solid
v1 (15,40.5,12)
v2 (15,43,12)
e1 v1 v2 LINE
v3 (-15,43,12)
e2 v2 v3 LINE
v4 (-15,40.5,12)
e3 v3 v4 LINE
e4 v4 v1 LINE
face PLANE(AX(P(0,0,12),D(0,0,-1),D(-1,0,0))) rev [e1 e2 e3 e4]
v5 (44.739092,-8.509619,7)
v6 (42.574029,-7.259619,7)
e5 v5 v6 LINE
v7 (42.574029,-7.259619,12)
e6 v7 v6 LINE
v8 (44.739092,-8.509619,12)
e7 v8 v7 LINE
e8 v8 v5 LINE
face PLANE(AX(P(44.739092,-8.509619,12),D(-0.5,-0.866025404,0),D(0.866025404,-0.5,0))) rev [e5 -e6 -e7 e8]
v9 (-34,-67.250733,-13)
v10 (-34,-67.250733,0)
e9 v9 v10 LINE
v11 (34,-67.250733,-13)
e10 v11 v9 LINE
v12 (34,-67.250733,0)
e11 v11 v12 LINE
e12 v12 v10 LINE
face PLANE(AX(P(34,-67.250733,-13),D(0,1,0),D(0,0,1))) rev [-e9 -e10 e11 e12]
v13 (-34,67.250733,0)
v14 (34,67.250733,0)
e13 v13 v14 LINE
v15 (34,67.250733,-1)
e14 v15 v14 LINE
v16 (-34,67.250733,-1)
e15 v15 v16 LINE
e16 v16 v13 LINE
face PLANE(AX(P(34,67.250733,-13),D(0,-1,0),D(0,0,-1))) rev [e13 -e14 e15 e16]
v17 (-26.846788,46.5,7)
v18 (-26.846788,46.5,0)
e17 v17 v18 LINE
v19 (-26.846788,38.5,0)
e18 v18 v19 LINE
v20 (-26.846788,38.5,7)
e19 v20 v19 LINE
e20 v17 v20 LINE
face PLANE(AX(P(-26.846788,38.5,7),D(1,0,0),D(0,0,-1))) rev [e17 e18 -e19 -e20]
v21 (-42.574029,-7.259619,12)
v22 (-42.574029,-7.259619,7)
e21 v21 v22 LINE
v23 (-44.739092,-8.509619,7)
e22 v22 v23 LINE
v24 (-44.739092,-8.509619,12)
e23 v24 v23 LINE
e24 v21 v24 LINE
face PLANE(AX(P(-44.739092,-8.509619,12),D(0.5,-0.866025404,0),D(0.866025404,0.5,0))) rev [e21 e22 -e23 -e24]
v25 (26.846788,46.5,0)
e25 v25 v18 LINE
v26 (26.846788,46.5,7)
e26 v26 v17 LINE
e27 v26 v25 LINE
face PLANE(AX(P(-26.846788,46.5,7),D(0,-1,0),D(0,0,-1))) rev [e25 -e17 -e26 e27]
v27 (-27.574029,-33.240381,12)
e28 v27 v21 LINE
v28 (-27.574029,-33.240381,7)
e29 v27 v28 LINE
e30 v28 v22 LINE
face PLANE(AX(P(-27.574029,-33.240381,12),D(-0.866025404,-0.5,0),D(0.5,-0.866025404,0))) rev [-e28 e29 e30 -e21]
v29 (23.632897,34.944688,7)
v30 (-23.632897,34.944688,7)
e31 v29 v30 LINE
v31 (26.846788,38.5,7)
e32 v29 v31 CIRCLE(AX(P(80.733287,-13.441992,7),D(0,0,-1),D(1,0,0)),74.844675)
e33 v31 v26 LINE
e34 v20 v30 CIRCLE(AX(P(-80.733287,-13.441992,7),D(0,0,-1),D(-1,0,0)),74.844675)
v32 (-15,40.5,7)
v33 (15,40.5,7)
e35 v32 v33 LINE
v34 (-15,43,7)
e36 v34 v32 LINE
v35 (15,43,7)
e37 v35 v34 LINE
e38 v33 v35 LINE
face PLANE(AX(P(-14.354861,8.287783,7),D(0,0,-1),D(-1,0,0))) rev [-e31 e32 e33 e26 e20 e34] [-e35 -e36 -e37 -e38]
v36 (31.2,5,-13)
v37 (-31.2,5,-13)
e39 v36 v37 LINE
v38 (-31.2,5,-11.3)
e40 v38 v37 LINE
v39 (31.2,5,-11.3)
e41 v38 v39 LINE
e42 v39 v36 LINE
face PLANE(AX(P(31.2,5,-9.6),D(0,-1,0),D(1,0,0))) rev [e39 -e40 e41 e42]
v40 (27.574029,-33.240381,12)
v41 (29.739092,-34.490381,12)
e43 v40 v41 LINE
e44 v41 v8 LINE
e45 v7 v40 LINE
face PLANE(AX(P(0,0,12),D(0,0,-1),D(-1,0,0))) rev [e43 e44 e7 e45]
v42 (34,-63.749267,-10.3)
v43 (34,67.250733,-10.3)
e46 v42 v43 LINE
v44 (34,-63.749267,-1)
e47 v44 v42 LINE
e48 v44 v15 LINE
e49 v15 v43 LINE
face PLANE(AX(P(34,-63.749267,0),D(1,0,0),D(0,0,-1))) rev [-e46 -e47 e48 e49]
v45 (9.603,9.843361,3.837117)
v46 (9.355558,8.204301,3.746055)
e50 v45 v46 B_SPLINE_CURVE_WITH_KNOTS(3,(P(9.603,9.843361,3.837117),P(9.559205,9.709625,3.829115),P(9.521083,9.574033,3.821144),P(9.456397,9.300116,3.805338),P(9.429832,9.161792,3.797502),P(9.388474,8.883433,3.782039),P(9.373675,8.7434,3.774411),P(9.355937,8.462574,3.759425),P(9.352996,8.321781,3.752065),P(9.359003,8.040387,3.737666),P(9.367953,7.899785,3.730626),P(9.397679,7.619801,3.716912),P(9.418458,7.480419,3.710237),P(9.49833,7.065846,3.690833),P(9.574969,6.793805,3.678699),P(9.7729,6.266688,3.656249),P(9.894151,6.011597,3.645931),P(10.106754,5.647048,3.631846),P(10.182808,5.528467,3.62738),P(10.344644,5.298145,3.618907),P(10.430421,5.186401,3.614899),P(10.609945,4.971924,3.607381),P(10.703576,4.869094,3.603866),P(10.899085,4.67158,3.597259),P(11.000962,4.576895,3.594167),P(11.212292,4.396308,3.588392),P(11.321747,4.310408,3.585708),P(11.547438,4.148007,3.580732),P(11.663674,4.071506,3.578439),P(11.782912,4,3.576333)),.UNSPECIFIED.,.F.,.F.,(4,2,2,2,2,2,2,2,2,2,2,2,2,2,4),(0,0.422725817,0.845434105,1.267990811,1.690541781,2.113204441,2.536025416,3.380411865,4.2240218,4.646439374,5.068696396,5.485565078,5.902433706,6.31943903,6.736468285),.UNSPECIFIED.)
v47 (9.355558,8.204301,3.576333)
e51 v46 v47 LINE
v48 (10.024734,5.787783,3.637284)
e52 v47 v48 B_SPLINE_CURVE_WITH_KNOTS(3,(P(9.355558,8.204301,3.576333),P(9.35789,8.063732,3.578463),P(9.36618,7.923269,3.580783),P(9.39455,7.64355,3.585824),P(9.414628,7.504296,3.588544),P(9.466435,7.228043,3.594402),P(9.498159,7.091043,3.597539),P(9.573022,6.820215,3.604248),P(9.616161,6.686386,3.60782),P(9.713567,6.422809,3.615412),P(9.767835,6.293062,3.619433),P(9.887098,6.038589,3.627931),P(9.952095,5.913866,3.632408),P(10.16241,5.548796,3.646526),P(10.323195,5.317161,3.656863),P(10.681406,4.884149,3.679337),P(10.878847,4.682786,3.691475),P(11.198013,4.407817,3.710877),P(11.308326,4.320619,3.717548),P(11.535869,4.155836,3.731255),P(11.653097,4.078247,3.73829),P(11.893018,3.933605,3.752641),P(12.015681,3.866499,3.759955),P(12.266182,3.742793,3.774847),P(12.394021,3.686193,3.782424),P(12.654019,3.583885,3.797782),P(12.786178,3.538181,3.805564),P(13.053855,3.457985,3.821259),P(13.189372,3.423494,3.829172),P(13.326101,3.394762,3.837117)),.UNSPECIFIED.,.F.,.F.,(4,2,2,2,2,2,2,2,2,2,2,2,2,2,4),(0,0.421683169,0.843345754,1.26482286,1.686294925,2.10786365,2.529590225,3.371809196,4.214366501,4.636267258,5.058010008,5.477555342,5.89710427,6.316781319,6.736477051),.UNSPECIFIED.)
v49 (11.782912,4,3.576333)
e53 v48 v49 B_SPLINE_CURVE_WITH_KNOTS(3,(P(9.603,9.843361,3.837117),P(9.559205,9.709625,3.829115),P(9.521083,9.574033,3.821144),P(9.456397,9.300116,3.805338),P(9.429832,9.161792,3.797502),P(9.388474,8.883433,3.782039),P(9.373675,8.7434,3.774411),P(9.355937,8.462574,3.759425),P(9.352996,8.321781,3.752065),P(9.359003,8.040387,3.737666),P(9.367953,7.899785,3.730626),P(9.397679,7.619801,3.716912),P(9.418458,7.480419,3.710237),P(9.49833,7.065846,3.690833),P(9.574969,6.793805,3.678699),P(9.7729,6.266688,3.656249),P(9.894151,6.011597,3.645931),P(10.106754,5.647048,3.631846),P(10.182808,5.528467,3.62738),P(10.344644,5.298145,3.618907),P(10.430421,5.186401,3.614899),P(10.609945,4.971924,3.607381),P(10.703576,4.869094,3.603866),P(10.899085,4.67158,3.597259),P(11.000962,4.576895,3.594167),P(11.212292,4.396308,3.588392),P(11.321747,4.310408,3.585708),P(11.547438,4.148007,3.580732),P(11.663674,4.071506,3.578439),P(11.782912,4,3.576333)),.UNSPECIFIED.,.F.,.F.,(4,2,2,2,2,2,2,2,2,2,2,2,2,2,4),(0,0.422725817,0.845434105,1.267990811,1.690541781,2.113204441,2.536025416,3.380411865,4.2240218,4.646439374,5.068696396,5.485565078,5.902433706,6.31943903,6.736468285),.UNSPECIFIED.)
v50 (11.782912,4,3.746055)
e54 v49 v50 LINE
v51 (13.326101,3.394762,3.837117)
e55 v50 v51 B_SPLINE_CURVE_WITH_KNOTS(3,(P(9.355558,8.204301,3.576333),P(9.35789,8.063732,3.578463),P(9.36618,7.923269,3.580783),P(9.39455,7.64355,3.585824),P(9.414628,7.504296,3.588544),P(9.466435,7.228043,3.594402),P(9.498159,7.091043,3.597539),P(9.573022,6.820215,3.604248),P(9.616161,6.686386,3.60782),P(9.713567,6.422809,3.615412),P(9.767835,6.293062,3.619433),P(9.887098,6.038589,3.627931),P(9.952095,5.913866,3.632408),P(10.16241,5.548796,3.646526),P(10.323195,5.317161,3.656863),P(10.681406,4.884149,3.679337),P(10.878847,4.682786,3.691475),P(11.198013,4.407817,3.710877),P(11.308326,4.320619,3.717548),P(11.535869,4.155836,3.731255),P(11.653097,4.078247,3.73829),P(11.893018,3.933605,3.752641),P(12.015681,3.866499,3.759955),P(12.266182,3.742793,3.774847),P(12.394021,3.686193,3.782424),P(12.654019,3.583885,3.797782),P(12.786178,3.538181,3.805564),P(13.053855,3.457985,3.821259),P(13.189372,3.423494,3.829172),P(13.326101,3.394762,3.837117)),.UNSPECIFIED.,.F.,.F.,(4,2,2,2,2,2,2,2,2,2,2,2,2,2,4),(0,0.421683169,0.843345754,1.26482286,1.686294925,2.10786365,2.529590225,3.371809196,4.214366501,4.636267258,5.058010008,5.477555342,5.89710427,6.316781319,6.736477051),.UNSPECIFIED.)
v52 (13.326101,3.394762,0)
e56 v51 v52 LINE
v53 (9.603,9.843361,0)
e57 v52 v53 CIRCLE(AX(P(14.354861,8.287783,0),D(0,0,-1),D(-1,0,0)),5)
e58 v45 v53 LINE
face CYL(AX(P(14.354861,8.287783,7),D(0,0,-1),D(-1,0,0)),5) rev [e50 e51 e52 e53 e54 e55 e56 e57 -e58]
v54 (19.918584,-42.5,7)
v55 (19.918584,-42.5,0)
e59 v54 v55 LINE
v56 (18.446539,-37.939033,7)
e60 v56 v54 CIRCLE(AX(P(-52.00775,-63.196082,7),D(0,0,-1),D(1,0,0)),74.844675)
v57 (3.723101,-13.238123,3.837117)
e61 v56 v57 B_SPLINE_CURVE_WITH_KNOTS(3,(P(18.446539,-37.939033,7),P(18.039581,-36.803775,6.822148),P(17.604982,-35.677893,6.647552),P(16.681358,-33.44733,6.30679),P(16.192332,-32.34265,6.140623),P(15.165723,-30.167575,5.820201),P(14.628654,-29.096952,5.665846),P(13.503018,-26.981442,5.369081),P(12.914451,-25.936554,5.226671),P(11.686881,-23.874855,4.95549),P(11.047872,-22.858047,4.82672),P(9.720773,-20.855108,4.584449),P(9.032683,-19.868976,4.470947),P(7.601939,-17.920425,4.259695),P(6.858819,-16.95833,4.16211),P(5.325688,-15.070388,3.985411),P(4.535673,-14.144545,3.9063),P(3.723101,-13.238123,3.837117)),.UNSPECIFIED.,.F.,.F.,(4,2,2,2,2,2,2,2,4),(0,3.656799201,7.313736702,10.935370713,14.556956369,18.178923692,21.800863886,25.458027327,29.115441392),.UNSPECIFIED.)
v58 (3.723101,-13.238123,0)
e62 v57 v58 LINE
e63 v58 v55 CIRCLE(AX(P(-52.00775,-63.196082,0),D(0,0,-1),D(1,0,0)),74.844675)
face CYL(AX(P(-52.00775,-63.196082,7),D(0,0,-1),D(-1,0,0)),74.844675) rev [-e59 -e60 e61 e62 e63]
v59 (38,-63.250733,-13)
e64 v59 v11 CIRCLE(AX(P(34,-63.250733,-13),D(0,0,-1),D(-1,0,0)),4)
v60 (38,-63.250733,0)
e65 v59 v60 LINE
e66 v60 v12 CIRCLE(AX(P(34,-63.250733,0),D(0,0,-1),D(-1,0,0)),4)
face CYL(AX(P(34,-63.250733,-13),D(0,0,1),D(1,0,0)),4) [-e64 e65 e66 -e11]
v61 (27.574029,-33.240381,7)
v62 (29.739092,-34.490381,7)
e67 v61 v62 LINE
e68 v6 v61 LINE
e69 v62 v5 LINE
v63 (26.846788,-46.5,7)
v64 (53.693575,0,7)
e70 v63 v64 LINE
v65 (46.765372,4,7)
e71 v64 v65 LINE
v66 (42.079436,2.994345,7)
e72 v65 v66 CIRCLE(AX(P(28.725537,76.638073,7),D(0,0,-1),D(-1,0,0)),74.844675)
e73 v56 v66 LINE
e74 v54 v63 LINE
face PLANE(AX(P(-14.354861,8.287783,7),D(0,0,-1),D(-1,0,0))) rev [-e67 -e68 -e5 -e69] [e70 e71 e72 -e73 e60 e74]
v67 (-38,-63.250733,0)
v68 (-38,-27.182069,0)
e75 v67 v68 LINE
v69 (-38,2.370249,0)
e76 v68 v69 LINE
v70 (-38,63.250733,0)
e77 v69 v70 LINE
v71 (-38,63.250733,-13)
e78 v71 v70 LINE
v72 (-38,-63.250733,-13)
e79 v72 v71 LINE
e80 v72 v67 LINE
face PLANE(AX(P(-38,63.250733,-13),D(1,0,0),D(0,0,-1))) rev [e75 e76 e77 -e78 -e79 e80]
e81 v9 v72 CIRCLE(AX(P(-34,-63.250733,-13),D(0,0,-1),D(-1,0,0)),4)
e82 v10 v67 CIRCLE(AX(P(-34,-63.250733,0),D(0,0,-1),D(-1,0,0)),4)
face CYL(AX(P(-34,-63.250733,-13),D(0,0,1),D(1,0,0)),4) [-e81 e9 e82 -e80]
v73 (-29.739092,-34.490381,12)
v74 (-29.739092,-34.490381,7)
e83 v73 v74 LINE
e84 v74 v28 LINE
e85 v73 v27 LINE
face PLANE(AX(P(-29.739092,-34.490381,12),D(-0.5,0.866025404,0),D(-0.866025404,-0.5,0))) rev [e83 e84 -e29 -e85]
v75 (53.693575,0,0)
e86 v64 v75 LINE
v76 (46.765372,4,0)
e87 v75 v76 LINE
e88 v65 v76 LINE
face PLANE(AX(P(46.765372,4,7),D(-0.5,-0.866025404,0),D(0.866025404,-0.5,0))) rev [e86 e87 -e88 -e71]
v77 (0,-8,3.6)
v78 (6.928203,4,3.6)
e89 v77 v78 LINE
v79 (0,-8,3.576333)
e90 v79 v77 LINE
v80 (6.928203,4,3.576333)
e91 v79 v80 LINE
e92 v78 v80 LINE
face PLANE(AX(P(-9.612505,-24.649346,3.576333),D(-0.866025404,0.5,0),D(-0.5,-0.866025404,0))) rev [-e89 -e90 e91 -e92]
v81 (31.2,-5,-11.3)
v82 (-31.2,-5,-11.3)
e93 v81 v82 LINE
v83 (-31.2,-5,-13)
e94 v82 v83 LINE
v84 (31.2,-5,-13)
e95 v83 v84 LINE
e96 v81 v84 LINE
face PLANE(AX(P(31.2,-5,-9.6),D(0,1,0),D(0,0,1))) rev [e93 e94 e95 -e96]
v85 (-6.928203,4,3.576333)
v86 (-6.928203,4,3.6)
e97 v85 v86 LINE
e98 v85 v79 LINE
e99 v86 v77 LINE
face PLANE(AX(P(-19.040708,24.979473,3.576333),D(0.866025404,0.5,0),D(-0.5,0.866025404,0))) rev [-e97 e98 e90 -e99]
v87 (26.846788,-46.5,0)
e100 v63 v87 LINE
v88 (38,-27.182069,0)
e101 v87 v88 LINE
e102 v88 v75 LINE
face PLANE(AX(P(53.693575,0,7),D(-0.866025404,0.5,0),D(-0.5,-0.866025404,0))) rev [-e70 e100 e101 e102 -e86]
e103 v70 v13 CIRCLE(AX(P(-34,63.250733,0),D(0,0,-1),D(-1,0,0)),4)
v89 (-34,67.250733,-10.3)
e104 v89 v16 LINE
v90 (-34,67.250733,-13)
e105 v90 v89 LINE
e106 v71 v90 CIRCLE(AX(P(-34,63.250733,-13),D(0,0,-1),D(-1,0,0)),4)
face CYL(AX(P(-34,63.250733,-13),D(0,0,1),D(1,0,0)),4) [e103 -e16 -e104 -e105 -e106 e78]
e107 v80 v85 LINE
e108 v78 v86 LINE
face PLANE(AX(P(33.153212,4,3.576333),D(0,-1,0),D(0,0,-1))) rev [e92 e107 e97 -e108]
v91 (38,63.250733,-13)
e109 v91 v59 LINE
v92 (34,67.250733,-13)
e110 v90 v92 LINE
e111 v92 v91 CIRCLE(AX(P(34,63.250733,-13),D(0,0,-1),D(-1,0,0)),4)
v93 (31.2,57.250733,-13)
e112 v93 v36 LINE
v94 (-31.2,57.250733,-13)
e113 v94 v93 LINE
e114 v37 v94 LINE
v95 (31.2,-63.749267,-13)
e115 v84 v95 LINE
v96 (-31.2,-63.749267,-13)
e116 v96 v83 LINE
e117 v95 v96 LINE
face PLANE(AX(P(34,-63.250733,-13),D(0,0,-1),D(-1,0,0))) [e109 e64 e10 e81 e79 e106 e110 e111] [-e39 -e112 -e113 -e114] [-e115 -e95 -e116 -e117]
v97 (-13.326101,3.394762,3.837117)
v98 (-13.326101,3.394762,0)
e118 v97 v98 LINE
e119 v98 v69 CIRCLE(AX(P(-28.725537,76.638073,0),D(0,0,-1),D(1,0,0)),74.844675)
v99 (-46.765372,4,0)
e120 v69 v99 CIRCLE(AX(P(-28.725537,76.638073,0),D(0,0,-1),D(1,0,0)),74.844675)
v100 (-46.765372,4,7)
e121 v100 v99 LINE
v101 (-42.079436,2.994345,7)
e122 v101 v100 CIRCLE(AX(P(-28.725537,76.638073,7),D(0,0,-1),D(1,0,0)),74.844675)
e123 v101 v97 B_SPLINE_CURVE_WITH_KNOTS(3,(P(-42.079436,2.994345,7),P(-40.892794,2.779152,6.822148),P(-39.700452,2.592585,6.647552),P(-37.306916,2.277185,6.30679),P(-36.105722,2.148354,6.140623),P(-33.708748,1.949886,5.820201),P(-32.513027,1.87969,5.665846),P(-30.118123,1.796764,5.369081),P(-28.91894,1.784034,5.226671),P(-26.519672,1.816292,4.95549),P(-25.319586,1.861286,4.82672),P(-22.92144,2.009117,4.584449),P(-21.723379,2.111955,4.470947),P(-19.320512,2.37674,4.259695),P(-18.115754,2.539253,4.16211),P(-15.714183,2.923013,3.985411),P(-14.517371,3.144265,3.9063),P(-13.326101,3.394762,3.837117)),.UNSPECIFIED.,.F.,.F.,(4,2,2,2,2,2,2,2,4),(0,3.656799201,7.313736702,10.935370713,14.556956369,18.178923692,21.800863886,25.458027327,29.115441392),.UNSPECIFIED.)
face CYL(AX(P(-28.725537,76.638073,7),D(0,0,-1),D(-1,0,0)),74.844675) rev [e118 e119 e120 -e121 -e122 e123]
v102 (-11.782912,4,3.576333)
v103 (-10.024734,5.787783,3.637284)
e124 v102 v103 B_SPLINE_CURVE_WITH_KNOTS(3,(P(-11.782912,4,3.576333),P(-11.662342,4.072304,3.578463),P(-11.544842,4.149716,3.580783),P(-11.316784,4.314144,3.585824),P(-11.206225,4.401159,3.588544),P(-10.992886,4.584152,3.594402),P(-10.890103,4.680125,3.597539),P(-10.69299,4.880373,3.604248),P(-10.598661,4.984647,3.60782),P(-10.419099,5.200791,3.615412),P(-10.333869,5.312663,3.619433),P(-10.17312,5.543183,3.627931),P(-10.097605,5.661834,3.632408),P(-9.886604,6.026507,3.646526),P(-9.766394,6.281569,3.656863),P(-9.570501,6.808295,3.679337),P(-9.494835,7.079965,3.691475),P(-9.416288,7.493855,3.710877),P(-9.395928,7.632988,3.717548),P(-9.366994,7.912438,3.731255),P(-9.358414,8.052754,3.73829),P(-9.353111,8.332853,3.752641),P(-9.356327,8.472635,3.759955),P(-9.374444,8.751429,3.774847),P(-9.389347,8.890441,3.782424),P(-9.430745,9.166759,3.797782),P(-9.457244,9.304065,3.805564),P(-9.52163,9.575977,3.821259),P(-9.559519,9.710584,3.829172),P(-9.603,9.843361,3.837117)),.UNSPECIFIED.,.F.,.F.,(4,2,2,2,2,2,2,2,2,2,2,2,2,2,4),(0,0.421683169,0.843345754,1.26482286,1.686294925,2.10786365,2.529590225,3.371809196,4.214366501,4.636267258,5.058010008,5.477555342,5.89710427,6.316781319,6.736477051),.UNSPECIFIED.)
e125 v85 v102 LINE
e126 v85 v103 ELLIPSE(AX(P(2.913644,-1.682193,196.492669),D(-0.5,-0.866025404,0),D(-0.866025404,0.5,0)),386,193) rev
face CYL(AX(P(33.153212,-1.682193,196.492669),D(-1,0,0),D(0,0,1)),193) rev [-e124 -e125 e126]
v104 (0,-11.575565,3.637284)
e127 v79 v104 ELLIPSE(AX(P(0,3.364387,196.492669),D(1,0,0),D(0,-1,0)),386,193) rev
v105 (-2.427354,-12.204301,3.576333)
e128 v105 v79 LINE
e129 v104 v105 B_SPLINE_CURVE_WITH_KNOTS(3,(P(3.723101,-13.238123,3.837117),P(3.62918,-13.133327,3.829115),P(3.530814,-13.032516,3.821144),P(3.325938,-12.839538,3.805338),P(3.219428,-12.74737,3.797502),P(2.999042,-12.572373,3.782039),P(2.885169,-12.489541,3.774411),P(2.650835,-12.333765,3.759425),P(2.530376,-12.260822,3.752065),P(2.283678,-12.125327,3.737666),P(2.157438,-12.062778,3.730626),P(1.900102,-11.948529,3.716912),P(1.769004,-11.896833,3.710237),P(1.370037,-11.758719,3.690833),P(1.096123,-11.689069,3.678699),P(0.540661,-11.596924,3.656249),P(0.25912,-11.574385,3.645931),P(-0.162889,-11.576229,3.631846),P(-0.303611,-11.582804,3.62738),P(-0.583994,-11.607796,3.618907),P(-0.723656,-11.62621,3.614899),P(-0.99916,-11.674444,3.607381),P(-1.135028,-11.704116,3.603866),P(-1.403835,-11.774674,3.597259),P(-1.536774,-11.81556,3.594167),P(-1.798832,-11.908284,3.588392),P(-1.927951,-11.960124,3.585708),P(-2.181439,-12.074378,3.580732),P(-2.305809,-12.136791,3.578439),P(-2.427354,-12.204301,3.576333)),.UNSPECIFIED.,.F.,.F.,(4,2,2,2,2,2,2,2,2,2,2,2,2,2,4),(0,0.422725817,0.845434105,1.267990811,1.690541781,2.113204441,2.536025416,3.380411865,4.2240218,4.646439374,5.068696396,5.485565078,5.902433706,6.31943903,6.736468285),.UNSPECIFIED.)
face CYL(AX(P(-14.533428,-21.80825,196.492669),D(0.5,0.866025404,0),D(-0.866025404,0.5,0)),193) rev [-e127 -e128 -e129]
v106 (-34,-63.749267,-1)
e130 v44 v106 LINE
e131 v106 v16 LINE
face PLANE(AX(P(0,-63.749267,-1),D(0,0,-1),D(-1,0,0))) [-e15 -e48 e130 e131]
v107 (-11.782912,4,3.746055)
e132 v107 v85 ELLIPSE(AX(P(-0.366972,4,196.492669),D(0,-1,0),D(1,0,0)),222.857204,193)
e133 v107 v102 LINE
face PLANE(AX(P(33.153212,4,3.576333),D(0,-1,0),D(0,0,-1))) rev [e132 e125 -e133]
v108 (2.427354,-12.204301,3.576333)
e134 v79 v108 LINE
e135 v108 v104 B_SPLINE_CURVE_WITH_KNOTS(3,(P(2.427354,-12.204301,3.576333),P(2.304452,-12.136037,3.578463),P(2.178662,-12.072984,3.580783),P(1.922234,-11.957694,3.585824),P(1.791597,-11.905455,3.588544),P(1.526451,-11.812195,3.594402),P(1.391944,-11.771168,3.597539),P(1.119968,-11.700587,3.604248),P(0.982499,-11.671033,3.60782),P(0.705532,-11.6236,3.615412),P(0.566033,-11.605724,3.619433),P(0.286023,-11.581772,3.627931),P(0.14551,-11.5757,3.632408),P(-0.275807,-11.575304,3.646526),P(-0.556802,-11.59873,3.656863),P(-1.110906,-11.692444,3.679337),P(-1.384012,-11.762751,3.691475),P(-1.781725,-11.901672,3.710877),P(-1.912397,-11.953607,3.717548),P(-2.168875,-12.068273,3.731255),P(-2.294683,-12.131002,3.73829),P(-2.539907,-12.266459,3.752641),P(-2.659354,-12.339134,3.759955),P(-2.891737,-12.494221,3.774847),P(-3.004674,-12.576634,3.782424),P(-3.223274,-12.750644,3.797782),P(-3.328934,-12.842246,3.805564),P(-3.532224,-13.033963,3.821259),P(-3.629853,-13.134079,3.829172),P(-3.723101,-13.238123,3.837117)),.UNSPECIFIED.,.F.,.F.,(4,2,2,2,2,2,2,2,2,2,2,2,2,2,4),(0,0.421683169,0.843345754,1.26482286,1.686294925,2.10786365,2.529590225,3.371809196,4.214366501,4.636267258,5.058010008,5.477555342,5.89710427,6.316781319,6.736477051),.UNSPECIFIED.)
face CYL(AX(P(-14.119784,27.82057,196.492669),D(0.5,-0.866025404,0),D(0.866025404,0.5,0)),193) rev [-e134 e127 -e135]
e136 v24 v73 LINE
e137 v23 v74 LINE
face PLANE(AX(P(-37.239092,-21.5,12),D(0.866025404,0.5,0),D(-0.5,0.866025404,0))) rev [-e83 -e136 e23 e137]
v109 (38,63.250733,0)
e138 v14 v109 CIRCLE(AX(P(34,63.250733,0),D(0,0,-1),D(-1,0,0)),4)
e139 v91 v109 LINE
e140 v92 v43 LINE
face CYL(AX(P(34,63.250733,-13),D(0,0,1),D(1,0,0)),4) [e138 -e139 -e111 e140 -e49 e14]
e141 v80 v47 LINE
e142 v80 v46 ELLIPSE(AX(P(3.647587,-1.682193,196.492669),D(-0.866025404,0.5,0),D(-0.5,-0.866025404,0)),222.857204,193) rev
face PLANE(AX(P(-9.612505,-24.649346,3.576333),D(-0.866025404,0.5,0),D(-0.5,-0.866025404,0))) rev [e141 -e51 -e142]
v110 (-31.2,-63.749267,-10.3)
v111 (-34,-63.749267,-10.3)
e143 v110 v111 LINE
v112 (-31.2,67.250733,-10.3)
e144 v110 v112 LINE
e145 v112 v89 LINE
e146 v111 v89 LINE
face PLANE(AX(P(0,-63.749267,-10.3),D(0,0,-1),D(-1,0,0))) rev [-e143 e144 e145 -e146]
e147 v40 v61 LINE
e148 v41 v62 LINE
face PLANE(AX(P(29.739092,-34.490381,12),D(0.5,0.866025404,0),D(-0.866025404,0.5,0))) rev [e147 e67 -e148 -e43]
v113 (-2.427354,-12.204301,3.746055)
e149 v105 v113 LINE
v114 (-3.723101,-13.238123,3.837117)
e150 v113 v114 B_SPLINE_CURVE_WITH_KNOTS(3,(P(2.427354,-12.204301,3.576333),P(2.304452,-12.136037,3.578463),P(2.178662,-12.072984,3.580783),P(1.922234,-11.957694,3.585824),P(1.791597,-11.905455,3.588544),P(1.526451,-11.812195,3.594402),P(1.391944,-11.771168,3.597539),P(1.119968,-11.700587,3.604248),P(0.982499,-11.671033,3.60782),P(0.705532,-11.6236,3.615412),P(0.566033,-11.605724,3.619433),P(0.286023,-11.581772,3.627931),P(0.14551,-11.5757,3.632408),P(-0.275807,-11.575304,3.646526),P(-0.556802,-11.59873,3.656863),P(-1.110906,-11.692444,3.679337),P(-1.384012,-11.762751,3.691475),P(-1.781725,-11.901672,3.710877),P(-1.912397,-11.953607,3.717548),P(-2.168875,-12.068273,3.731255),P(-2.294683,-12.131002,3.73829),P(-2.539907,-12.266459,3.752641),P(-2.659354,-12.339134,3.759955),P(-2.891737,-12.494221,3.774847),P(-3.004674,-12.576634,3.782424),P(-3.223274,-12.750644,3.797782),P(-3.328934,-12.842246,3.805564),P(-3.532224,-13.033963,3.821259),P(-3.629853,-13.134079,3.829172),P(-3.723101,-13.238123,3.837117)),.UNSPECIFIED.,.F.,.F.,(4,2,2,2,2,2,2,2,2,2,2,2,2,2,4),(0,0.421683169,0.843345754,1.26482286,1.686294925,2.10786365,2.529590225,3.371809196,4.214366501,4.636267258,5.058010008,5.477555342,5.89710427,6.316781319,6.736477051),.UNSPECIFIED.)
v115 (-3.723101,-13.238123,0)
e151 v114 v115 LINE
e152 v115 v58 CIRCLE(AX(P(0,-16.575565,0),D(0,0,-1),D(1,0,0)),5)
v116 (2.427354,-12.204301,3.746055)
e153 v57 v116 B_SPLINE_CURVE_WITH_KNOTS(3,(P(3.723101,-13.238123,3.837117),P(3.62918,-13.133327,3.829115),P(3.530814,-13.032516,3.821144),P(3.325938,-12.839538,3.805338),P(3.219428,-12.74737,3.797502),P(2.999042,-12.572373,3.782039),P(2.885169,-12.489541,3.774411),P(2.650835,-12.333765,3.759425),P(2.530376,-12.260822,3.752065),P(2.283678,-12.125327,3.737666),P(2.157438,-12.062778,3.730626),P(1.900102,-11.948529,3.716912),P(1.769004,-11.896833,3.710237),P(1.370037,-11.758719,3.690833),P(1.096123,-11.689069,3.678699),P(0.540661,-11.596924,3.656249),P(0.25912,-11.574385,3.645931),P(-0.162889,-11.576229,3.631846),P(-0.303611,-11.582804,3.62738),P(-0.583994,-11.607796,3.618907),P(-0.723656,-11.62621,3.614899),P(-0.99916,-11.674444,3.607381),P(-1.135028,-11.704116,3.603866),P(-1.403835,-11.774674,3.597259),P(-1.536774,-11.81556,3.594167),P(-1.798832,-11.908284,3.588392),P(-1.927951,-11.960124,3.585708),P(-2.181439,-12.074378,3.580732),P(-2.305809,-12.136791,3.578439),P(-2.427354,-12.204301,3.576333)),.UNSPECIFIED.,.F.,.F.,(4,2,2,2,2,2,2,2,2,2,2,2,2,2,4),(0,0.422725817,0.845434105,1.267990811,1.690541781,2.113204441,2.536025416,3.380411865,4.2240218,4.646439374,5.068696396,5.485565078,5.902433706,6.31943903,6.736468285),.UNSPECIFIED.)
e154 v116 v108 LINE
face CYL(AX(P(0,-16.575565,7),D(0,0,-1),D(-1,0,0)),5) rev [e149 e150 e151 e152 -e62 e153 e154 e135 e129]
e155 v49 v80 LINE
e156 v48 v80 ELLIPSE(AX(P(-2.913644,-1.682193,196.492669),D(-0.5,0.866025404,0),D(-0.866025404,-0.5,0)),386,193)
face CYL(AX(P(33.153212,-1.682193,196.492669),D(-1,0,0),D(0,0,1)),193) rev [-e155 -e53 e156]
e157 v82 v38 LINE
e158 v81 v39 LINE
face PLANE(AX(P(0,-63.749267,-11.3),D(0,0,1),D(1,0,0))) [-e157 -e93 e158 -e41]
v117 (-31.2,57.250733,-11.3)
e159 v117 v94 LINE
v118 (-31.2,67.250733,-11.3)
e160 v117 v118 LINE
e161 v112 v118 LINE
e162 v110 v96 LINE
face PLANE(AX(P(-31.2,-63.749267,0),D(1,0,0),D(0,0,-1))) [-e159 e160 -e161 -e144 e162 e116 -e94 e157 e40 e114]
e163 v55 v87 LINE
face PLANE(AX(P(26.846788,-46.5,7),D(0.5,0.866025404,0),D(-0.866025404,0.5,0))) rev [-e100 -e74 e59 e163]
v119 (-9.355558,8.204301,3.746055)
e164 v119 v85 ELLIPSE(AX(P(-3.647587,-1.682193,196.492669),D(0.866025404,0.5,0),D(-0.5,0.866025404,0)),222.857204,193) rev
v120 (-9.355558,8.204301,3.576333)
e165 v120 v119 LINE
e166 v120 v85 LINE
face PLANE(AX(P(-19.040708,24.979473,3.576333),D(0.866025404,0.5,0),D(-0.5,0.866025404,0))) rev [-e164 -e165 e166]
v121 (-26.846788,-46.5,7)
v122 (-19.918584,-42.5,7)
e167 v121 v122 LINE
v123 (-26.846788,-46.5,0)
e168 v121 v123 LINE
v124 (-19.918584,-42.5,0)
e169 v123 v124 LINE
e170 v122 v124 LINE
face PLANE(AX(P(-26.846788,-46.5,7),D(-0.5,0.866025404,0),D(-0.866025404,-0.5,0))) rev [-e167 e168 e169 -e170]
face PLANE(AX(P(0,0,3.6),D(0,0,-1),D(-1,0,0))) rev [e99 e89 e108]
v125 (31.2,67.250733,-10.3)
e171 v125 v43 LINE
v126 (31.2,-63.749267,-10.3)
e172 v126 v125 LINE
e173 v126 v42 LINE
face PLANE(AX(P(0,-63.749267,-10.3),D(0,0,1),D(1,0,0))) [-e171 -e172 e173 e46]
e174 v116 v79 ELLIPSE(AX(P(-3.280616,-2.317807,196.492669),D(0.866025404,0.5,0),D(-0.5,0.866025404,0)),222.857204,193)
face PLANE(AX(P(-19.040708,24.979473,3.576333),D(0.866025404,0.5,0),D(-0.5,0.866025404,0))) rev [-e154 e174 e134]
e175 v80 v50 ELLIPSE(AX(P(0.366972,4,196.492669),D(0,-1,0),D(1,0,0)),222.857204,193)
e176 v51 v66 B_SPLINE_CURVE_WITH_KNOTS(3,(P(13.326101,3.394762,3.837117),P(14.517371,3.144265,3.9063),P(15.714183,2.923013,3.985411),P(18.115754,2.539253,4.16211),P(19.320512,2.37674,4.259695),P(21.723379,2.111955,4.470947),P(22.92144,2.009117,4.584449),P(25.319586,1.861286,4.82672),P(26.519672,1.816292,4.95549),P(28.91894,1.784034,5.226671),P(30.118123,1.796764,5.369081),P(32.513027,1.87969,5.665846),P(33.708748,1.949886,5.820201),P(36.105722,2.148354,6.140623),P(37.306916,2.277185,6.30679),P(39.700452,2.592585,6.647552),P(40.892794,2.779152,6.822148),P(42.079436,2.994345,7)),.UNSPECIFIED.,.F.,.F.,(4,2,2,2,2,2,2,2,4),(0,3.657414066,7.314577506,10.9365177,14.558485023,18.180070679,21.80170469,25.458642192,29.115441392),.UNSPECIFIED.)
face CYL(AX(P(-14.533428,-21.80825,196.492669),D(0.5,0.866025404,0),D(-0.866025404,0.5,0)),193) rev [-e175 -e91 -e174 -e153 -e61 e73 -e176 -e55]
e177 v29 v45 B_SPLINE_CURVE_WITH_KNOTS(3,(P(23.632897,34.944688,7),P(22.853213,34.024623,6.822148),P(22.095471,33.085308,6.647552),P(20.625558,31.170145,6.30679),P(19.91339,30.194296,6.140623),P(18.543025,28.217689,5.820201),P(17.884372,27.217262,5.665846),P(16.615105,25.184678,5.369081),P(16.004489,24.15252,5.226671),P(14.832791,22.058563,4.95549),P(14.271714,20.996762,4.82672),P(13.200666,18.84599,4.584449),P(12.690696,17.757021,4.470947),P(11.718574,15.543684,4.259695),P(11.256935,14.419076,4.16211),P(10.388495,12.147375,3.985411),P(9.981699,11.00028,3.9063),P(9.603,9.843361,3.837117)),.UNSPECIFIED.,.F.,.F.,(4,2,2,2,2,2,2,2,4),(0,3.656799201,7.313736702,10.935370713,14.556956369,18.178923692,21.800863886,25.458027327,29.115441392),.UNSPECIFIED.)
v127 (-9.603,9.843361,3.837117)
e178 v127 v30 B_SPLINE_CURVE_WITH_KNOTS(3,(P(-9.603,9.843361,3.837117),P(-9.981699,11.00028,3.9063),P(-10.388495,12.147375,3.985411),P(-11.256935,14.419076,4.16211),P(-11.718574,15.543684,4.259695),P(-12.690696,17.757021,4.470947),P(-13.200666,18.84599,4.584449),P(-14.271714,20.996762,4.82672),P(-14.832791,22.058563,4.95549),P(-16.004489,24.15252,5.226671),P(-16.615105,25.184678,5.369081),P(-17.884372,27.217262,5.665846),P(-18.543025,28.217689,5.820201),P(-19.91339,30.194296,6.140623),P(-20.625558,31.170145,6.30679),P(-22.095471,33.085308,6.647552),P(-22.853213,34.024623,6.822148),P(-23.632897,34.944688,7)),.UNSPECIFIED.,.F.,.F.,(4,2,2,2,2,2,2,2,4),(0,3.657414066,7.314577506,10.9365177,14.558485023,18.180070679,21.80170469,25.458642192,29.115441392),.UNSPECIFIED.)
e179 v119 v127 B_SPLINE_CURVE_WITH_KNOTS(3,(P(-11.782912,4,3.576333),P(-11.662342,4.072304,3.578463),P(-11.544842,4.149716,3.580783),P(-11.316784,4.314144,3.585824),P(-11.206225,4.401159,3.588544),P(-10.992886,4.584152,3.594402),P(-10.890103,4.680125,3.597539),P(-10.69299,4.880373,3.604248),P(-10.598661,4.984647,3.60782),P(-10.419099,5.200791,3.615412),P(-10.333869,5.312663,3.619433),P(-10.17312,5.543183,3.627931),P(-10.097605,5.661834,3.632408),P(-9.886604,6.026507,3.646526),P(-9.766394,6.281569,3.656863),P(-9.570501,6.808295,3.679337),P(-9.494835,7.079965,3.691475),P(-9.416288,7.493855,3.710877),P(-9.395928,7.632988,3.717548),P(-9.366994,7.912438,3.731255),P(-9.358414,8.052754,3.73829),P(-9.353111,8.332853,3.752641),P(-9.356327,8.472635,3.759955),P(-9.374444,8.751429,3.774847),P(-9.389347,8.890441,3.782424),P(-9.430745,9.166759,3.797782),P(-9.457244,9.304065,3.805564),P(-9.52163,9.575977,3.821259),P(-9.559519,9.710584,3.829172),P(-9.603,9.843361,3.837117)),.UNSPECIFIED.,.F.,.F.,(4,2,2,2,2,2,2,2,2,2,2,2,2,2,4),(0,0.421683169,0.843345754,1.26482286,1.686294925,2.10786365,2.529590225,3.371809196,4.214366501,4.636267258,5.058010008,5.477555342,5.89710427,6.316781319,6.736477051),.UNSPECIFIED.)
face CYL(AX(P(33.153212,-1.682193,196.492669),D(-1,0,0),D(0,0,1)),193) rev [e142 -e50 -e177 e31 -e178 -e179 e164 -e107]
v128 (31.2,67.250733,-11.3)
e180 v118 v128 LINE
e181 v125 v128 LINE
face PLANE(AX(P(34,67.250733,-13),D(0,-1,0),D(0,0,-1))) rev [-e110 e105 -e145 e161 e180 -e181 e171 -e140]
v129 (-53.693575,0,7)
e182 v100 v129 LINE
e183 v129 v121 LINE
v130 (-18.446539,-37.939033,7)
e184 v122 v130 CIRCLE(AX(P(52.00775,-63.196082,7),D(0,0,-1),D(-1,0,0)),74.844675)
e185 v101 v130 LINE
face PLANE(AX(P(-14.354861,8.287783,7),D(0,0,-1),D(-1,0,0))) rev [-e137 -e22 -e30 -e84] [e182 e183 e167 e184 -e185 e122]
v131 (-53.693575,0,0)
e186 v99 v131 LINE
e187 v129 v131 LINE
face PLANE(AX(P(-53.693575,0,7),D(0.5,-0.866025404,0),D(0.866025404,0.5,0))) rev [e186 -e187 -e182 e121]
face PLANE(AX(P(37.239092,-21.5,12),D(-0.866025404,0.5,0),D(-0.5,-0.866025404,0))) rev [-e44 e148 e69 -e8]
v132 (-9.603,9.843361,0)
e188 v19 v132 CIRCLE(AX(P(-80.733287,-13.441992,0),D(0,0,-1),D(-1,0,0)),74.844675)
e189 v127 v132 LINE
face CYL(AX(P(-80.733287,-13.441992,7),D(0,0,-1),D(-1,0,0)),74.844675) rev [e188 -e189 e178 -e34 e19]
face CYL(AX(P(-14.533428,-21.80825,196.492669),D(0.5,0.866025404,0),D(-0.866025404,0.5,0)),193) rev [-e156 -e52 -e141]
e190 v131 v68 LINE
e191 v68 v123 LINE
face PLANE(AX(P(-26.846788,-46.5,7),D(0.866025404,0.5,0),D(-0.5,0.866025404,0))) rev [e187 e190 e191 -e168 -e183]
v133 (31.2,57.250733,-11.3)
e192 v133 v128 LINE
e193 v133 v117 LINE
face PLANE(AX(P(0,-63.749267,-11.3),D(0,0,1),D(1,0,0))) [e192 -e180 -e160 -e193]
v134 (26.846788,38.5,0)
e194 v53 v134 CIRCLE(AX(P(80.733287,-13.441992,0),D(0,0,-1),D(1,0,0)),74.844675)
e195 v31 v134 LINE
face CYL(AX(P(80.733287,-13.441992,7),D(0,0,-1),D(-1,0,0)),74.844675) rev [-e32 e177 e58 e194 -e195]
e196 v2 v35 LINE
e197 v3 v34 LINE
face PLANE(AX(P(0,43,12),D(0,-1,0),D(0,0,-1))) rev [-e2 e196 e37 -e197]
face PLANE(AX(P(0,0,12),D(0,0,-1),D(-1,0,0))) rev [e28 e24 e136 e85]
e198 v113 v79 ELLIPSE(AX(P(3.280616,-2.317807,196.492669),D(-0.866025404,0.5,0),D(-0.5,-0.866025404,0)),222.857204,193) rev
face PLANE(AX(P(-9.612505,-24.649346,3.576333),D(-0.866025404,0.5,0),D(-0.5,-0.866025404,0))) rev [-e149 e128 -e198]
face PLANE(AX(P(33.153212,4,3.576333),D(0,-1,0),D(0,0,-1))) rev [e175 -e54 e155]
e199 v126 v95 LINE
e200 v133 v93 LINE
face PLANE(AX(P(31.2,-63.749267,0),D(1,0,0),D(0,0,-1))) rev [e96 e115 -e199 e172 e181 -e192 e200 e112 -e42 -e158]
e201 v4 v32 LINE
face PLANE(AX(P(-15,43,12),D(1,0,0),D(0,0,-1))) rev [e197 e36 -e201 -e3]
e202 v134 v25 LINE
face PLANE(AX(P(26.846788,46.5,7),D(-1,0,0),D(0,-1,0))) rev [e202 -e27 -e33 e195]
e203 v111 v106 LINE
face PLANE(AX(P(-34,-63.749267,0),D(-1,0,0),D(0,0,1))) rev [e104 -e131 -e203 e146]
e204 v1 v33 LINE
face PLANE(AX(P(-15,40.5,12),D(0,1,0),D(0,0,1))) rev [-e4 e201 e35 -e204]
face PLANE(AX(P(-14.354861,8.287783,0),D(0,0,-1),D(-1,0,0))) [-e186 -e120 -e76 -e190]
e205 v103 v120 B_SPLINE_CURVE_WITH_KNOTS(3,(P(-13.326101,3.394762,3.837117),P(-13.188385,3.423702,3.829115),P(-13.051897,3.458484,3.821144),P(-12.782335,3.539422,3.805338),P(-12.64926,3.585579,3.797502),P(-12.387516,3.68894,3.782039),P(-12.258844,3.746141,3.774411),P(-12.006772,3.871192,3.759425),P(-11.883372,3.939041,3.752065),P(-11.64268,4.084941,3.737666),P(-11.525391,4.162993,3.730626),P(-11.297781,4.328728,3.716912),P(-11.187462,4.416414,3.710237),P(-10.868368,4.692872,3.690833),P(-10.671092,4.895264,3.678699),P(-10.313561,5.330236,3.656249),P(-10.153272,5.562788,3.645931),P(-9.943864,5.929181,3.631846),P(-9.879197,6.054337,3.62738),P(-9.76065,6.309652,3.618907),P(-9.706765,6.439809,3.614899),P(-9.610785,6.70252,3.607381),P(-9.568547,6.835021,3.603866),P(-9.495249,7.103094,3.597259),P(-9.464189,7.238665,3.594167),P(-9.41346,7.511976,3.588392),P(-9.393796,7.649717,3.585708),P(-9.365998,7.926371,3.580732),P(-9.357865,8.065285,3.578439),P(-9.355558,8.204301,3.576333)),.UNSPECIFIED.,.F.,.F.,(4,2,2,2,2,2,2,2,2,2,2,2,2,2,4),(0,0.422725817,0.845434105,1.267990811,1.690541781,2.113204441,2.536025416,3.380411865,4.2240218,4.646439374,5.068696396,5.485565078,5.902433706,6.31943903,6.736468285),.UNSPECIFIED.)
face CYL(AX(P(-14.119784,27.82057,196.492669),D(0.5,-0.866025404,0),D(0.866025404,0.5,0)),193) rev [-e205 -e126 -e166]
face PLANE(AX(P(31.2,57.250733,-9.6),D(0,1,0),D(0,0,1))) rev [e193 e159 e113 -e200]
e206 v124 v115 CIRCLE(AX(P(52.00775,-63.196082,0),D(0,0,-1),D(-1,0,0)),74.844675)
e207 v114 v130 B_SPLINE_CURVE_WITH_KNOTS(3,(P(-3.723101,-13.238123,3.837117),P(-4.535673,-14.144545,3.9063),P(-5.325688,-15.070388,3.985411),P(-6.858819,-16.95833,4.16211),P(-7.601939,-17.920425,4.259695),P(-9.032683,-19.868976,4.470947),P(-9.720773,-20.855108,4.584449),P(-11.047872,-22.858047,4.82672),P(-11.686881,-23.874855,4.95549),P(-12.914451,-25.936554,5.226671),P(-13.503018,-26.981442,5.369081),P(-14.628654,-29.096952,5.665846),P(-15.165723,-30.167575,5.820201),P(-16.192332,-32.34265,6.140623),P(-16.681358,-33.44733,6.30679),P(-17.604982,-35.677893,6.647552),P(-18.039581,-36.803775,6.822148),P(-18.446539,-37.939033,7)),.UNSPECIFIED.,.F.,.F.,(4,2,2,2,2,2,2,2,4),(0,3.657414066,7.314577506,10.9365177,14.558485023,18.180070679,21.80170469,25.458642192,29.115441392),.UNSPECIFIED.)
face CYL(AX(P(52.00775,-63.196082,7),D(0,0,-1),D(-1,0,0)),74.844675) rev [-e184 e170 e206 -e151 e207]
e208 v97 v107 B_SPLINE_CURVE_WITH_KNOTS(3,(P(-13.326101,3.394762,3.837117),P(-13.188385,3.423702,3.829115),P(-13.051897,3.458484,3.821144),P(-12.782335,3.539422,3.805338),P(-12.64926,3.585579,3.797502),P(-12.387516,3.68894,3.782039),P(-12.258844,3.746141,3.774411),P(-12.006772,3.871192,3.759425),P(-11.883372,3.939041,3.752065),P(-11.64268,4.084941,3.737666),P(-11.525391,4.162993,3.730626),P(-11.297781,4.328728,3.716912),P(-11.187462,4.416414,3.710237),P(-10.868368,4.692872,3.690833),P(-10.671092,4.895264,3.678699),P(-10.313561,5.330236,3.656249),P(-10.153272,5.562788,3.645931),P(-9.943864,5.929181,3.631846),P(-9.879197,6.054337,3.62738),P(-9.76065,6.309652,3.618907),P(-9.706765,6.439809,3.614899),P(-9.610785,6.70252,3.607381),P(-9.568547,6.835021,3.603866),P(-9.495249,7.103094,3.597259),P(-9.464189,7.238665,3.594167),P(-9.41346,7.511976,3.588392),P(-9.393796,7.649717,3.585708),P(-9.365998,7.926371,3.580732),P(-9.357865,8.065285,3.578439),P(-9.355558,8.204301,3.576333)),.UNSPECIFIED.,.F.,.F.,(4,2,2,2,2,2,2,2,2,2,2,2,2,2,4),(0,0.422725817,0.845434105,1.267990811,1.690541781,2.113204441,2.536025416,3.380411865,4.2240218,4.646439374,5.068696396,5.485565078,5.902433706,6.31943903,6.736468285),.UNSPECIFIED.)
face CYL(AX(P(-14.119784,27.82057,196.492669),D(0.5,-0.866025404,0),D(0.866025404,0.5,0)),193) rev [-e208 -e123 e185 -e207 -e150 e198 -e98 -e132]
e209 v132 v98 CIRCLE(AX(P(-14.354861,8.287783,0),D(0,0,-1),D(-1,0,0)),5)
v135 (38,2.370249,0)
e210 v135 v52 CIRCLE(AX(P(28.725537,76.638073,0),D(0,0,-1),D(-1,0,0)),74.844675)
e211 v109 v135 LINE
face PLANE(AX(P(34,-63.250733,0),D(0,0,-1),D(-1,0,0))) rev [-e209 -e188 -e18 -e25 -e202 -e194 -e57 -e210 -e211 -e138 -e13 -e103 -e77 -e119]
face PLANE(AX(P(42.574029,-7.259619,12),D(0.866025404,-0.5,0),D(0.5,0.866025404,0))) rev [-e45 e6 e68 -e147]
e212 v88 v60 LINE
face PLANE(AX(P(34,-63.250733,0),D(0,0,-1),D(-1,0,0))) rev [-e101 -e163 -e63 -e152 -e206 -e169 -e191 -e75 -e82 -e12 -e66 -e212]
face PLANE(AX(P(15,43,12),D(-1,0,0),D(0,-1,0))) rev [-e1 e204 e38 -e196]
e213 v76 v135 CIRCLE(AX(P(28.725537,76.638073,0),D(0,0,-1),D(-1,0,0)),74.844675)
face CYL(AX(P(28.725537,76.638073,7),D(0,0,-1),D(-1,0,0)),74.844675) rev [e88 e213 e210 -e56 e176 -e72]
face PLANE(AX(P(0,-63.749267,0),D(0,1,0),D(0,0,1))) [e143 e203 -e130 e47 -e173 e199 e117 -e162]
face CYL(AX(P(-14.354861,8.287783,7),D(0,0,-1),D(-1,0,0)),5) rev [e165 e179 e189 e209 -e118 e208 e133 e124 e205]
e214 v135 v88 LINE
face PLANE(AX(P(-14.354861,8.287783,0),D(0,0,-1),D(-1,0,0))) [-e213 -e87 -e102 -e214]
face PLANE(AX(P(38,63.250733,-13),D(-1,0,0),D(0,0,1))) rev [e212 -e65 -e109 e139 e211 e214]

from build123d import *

# Parameters (mm, degrees)
RESSALTO_EXTRUS_O1_DEPTH = 7
RESSALTO_EXTRUS_O2_DEPTH = 5
RESSALTO_EXTRUS_O3_DEPTH = 13
CORTE_EXTRUS_O1_DEPTH    = 131
CORTE_EXTRUS_O2_DEPTH    = 60
CORTE_EXTRUS_O3_DEPTH    = 58
CORTE_EXTRUS_O4_DEPTH    = 53
CORTE_EXTRUS_O5_DEPTH    = 3.4
ESBO_O13_W               = 62.4
ESBO_O13_H               = 52.25073341
ESBO_O13_H_2             = 58.74926659
CORTE_EXTRUS_O6_DEPTH    = 3.4


with BuildPart() as part:
    # Esboço1 → Ressalto-extrusão1 (new body)
    with BuildSketch(Plane.XY):
        with BuildLine():
            Line((-26.846787517, 46.5), (26.846787517, 46.5))
            Line((26.846787517, 46.5), (26.846787517, 38.5))
            ThreePointArc((26.846787517, 38.5), (16.603731122, 25.147195766), (9.603000417, 9.843361122))
            ThreePointArc((9.603000417, 9.843361122), (10.024733627, 5.787782658), (13.326100999, 3.394761752))
            ThreePointArc((13.326100999, 3.394761752), (30.079975929, 1.805655066), (46.765371804, 4))
            Line((46.765371804, 4), (53.693575035, 0))
            Line((53.693575035, 0), (26.846787517, -46.5))
            Line((26.846787517, -46.5), (19.918584287, -42.5))
            ThreePointArc((19.918584287, -42.5), (13.476244807, -26.952850832), (3.723100582, -13.238122875))
            ThreePointArc((3.723100582, -13.238122875), (0, -11.575565317), (-3.723100582, -13.238122875))
            ThreePointArc((-3.723100582, -13.238122875), (-13.476244807, -26.952850832), (-19.918584287, -42.5))
            Line((-19.918584287, -42.5), (-26.846787517, -46.5))
            Line((-26.846787517, -46.5), (-53.693575035, 0))
            Line((-53.693575035, 0), (-46.765371804, 4))
            ThreePointArc((-46.765371804, 4), (-30.079975929, 1.805655066), (-13.326100999, 3.394761752))
            ThreePointArc((-13.326100999, 3.394761752), (-10.024733627, 5.787782658), (-9.603000417, 9.843361122))
            ThreePointArc((-9.603000417, 9.843361122), (-16.603731122, 25.147195766), (-26.846787517, 38.5))
            Line((-26.846787517, 38.5), (-26.846787517, 46.5))
        make_face()
    extrude(amount=RESSALTO_EXTRUS_O1_DEPTH)

    # Esboço2 → Ressalto-extrusão2 (add)
    with BuildSketch(Plane.XY.offset(7)):
        Polygon((37.239092363, -21.5), (44.739092363, -8.509618943), (42.574028853, -7.259618943), (27.574028853, -33.240381057), (29.739092363, -34.490381057), align=None)
        Polygon((0, 43), (-15, 43), (-15, 40.5), (15, 40.5), (15, 43), align=None)
        Polygon((-37.239092363, -21.5), (-29.739092363, -34.490381057), (-27.574028853, -33.240381057), (-42.574028853, -7.259618943), (-44.739092363, -8.509618943), align=None)
    extrude(amount=RESSALTO_EXTRUS_O2_DEPTH)

    # Esboço3 → Ressalto-extrusão3 (add)
    with BuildSketch(Plane(origin=(0, 0, 0), x_dir=(-1, 0, 0), z_dir=(0, 0, -1))):
        with BuildLine():
            Line((38, 63.25073341), (38, -63.25073341))
            ThreePointArc((38, -63.25073341), (36.828427125, -66.079160535), (34, -67.25073341))
            Line((34, -67.25073341), (-34, -67.25073341))
            ThreePointArc((-34, -67.25073341), (-36.828427125, -66.079160535), (-38, -63.25073341))
            Line((-38, -63.25073341), (-38, 63.25073341))
            ThreePointArc((-38, 63.25073341), (-36.828427125, 66.079160535), (-34, 67.25073341))
            Line((-34, 67.25073341), (34, 67.25073341))
            ThreePointArc((34, 67.25073341), (36.828427125, 66.079160535), (38, 63.25073341))
        make_face()
    extrude(amount=RESSALTO_EXTRUS_O3_DEPTH)

    # Esboço4 → Corte-extrusão1 (cut)
    with BuildSketch(Plane(origin=(0, 67.25073341, 0), x_dir=(1, 0, 0), z_dir=(0, 1, 0))):
        Polygon((0, 1), (34, 1), (34, 10.3), (31.2, 10.3), (31.2, 11.3), (-31.2, 11.3), (-31.2, 10.3), (-34, 10.3), (-34, 1), align=None)
    extrude(amount=-CORTE_EXTRUS_O1_DEPTH, mode=Mode.SUBTRACT)

    # Esboço6 → Corte-extrusão2 (cut)
    with BuildSketch(Plane.ZY.offset(26.846787517)):
        with BuildLine():
            Line((18.516337651, 34.944688344), (7, 34.944688344))
            ThreePointArc((7, 34.944688344), (4.663173788, 19.541492285), (3.576332881, 4))
            Line((3.576332881, 4), (21.222643852, 4))
            Line((21.222643852, 4), (18.516337651, 34.944688344))
        make_face()
    extrude(amount=-CORTE_EXTRUS_O2_DEPTH, mode=Mode.SUBTRACT)

    # Esboço8 → Corte-extrusão3 (cut)
    with BuildSketch(Plane(origin=(13.423393759, -23.25, 0), x_dir=(0.8660254037844386, 0.5000000000000003, 0), z_dir=(0.5000000000000003, -0.8660254037844386, 0))):
        with BuildLine():
            Line((-34.944688344, 18.516337651), (-34.944688344, 7))
            ThreePointArc((-34.944688344, 7), (-19.541492285, 4.663173788), (-4, 3.576332881))
            Line((-4, 3.576332881), (-4, 21.222643852))
            Line((-4, 21.222643852), (-34.944688344, 18.516337651))
        make_face()
    extrude(amount=-CORTE_EXTRUS_O3_DEPTH, mode=Mode.SUBTRACT)

    # Esboço10 → Corte-extrusão4 (cut)
    with BuildSketch(Plane(origin=(13.423393759, 23.25, 0), x_dir=(0.8660254037845888, -0.4999999999997399, 0), z_dir=(0.49999999999973993, 0.8660254037845889, 0))):
        with BuildLine():
            Line((34.944688344, -18.516337651), (34.944688344, -7))
            ThreePointArc((34.944688344, -7), (19.541492285, -4.663173788), (4, -3.576332881))
            Line((4, -3.576332881), (4, -21.222643852))
            Line((4, -21.222643852), (34.944688344, -18.516337651))
        make_face()
    extrude(amount=-CORTE_EXTRUS_O4_DEPTH, mode=Mode.SUBTRACT)

    # Esboço11 → Corte-extrusão5 (cut)
    with BuildSketch(Plane.XY.offset(7)):
        Polygon((-6.92820323, 4), (6.92820323, 4), (0, -8), align=None)
    extrude(amount=-CORTE_EXTRUS_O5_DEPTH, mode=Mode.SUBTRACT)

    # Esboço13 → Corte-extrusão6 (cut)
    with BuildSketch(Plane(origin=(0, 0, -13), x_dir=(-1, 0, 0), z_dir=(0, 0, -1))):
        with Locations((0, 31.125366705)):
            Rectangle(ESBO_O13_W, ESBO_O13_H)
        with Locations((0, -34.374633295)):
            Rectangle(ESBO_O13_W, ESBO_O13_H_2)
    extrude(amount=-CORTE_EXTRUS_O6_DEPTH, mode=Mode.SUBTRACT)


solid = part.part
